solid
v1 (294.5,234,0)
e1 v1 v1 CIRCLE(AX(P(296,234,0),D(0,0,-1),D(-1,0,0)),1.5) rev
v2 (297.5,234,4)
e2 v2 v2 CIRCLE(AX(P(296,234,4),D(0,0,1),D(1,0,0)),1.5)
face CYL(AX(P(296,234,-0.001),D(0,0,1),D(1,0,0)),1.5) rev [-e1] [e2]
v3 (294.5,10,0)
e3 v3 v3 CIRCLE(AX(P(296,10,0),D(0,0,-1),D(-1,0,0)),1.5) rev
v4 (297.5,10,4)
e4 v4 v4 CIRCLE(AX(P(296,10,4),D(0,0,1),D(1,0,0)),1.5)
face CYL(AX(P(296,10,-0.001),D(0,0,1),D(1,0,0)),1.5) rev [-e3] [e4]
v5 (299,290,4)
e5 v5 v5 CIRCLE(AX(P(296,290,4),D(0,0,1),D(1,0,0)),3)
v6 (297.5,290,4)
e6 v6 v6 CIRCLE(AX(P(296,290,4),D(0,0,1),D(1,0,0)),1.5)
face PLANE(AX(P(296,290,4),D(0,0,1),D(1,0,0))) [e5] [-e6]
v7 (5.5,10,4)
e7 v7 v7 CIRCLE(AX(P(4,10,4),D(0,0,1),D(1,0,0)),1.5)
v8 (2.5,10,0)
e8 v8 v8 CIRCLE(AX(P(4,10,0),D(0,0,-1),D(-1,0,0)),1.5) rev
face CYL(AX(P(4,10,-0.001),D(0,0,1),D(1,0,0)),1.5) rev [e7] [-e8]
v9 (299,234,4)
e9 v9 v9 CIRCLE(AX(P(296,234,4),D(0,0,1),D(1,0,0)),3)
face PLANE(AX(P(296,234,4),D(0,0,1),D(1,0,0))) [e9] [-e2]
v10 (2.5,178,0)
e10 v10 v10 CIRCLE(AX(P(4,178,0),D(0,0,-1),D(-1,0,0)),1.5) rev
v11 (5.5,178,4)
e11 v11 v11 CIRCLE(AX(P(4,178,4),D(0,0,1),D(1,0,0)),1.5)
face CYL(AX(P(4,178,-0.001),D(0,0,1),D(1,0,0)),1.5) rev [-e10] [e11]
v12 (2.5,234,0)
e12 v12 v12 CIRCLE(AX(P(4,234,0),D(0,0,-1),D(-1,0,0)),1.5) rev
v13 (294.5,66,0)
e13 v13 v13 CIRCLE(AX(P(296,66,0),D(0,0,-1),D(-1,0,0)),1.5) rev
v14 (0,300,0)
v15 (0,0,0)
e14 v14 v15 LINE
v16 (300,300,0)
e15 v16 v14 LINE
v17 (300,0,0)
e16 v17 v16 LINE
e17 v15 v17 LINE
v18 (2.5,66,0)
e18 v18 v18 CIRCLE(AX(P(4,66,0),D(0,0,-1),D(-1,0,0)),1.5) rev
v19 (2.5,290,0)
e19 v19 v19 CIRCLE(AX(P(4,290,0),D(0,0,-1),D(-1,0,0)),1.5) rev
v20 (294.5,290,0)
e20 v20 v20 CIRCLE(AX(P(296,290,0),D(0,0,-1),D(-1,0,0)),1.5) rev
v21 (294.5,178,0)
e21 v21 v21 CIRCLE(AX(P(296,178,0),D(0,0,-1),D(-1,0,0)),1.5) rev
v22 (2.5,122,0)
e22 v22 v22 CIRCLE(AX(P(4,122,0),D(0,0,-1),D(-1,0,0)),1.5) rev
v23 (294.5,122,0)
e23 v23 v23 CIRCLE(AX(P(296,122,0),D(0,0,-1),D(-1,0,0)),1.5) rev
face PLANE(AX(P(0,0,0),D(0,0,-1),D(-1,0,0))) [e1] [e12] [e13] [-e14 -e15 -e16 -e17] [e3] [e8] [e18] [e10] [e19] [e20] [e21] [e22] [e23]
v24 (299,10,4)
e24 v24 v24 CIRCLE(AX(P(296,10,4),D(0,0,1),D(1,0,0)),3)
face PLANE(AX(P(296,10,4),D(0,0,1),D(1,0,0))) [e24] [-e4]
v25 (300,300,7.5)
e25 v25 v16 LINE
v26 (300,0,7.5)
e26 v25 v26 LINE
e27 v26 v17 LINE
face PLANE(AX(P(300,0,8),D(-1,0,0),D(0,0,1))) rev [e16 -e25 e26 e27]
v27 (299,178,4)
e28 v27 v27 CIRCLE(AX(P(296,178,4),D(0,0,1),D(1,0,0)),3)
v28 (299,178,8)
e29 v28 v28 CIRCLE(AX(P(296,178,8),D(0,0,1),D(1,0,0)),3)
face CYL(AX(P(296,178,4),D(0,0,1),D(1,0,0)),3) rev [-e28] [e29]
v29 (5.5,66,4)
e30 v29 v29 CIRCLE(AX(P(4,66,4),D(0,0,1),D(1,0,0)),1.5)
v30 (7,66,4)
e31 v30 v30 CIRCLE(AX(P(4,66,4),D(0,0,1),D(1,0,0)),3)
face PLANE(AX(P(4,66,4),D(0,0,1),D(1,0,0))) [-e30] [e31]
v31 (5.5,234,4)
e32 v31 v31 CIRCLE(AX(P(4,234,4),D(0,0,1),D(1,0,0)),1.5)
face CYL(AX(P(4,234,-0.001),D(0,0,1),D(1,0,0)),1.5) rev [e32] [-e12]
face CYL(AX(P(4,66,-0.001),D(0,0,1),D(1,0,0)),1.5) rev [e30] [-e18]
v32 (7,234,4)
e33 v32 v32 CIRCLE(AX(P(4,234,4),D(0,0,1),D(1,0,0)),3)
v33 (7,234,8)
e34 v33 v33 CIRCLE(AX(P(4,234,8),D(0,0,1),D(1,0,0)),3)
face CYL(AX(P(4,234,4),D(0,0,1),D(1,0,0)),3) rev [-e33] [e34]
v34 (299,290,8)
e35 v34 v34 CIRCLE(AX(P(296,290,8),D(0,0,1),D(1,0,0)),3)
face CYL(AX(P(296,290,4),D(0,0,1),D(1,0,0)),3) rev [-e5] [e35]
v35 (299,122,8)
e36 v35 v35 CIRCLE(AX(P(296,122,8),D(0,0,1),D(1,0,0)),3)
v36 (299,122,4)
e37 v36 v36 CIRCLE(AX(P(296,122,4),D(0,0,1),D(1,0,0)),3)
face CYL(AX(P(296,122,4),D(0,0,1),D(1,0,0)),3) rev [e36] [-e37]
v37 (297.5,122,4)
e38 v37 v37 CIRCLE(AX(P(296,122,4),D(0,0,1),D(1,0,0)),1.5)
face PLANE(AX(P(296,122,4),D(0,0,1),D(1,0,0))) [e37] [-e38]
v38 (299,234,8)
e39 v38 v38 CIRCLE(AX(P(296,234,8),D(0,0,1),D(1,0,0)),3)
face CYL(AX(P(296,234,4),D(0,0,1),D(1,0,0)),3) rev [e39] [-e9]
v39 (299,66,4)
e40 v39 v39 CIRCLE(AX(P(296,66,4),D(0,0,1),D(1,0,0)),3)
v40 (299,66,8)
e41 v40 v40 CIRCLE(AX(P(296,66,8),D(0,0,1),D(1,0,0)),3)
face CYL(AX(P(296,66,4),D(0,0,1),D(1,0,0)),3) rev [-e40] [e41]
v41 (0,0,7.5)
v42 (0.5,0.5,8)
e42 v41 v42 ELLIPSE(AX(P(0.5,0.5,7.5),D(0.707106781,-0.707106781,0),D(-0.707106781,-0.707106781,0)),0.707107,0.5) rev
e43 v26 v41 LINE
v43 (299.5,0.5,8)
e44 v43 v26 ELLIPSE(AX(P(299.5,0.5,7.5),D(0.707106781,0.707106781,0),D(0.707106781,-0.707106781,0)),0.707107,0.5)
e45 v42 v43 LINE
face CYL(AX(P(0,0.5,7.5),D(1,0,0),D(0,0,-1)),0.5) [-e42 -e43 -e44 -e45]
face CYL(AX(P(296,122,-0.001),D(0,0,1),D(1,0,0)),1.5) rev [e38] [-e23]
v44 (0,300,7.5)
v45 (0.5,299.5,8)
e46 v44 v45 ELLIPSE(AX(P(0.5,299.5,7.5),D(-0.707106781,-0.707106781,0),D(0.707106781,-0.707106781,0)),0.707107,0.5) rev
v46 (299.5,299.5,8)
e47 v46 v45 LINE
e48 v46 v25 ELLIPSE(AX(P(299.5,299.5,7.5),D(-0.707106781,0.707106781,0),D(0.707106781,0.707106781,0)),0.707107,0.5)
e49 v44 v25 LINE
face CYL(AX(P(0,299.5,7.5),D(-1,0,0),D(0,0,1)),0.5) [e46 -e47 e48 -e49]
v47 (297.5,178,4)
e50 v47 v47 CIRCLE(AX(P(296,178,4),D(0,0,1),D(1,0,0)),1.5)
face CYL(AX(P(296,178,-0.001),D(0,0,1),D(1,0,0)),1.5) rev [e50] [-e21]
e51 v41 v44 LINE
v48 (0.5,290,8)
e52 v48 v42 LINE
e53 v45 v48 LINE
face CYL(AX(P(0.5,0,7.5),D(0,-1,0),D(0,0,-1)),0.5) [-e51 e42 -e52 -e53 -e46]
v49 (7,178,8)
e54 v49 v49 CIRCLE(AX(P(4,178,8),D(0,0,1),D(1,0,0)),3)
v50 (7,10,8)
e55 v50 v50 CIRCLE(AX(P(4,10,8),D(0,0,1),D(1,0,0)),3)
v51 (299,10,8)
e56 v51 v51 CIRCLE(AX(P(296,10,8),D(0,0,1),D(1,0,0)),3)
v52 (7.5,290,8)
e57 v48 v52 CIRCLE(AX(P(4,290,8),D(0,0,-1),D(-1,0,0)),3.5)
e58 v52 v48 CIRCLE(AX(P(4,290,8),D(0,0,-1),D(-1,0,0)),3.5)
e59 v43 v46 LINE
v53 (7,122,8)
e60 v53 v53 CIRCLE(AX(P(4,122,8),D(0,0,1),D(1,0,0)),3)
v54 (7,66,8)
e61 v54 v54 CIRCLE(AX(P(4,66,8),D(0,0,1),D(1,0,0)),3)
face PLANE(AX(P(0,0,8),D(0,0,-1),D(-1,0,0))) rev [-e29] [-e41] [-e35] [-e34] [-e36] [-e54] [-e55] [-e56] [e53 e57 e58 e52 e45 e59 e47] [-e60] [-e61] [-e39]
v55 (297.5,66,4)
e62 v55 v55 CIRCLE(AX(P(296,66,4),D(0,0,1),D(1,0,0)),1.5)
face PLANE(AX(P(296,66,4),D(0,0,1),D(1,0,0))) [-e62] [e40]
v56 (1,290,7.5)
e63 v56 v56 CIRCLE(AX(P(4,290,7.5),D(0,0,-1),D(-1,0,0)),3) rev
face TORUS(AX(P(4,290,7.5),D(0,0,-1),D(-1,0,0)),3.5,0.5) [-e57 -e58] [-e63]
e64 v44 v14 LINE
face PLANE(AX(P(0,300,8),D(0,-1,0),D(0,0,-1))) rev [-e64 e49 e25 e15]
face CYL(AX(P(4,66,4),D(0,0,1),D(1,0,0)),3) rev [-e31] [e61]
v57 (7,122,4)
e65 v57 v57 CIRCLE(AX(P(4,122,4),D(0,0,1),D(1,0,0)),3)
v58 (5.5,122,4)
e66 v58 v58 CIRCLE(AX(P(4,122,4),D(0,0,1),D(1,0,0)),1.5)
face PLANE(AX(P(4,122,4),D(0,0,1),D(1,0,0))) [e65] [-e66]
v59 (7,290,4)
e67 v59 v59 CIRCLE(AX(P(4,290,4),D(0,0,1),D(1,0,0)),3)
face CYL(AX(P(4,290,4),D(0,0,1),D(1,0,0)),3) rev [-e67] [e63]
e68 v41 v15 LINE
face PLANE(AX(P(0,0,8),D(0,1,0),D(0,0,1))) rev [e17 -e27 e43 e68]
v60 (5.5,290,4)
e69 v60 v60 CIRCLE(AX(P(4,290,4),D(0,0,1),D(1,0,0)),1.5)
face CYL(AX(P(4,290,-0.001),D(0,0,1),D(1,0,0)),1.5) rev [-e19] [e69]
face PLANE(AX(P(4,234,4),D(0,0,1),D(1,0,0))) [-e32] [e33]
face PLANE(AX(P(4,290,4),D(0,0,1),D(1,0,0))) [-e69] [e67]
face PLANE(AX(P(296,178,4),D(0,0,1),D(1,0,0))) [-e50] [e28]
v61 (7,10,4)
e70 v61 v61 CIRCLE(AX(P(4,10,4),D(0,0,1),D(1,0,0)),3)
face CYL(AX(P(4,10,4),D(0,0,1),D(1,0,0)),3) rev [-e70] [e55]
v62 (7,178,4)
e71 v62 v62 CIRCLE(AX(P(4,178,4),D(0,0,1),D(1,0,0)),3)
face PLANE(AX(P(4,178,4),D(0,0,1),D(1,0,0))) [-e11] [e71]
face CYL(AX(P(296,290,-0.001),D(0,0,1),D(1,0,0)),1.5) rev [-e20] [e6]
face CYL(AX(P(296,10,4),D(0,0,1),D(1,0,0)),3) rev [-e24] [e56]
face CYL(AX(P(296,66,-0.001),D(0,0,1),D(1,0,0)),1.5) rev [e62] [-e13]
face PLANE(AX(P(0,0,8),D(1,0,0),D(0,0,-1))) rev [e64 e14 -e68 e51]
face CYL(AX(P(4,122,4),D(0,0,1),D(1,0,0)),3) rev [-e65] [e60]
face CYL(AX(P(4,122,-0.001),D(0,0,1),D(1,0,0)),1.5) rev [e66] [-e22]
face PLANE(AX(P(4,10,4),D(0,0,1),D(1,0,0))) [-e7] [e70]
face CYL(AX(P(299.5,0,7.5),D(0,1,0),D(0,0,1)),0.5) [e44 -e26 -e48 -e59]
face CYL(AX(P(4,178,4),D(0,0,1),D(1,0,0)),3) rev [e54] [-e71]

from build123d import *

# Parameters (mm, degrees)
SKETCH1_W            = 300
SKETCH1_H            = 300
BOSS_EXTRUDE1_DEPTH  = 8
SKETCH4_R            = 3
CUT_EXTRUDE2_DEPTH   = 4
CUT_EXTRUDE5_REACH   = 426.283
SKETCH7_R            = 1.5
FILLET1_R            = 0.5
LPATTERN1_COUNT      = 2
LPATTERN1_PITCH      = 292
LPATTERN1_COUNT_DIR2 = 6
LPATTERN1_PITCH_DIR2 = 56


with BuildPart() as part:
    # Sketch1 → Boss-Extrude1 (new body)
    with BuildSketch(Plane.XY):
        with Locations((150, 150)):
            Rectangle(SKETCH1_W, SKETCH1_H)
    extrude(amount=BOSS_EXTRUDE1_DEPTH)

    # Sketch4 → Cut-Extrude2 (cut)
    with BuildSketch(Plane.XY.offset(8)):
        with Locations((4, 290)):
            Circle(SKETCH4_R)
    cut_extrude2 = extrude(amount=-CUT_EXTRUDE2_DEPTH, mode=Mode.SUBTRACT)

    # Sketch7 → Cut-Extrude5 (cut, up to next)
    with BuildSketch(Plane.XY.offset(4), mode=Mode.PRIVATE) as cut_extrude5_sk1:
        with Locations((4, 290)):
            Circle(SKETCH7_R)
    cut_extrude5_tool1 = extrude(cut_extrude5_sk1.sketch, amount=-CUT_EXTRUDE5_REACH, mode=Mode.PRIVATE) & part.part
    cut_extrude5 = cut_extrude5_tool1.solids().sort_by_distance((4, 290, 4))[0]
    add(cut_extrude5, mode=Mode.SUBTRACT)

    # Fillet1
    fillet1_edges = [part.edges().sort_by_distance(p)[0] for p in [
        (300, 150, 8),
        (150, 300, 8),
        (1, 290, 8),
        (0, 150, 8),
        (150, 0, 8),
    ]]
    fillet(fillet1_edges, radius=FILLET1_R - 0.0001)  # a hair under: the kernel refuses the full size

    # LPattern1: Cut-Extrude2, Cut-Extrude5 2 × 6
    with Locations(*[(i * LPATTERN1_PITCH, -j * LPATTERN1_PITCH_DIR2, 0) for i in range(LPATTERN1_COUNT) for j in range(LPATTERN1_COUNT_DIR2) if (i, j) != (0, 0)]):
        add(cut_extrude2, mode=Mode.SUBTRACT)
        add(cut_extrude5, mode=Mode.SUBTRACT)


solid = part.part
